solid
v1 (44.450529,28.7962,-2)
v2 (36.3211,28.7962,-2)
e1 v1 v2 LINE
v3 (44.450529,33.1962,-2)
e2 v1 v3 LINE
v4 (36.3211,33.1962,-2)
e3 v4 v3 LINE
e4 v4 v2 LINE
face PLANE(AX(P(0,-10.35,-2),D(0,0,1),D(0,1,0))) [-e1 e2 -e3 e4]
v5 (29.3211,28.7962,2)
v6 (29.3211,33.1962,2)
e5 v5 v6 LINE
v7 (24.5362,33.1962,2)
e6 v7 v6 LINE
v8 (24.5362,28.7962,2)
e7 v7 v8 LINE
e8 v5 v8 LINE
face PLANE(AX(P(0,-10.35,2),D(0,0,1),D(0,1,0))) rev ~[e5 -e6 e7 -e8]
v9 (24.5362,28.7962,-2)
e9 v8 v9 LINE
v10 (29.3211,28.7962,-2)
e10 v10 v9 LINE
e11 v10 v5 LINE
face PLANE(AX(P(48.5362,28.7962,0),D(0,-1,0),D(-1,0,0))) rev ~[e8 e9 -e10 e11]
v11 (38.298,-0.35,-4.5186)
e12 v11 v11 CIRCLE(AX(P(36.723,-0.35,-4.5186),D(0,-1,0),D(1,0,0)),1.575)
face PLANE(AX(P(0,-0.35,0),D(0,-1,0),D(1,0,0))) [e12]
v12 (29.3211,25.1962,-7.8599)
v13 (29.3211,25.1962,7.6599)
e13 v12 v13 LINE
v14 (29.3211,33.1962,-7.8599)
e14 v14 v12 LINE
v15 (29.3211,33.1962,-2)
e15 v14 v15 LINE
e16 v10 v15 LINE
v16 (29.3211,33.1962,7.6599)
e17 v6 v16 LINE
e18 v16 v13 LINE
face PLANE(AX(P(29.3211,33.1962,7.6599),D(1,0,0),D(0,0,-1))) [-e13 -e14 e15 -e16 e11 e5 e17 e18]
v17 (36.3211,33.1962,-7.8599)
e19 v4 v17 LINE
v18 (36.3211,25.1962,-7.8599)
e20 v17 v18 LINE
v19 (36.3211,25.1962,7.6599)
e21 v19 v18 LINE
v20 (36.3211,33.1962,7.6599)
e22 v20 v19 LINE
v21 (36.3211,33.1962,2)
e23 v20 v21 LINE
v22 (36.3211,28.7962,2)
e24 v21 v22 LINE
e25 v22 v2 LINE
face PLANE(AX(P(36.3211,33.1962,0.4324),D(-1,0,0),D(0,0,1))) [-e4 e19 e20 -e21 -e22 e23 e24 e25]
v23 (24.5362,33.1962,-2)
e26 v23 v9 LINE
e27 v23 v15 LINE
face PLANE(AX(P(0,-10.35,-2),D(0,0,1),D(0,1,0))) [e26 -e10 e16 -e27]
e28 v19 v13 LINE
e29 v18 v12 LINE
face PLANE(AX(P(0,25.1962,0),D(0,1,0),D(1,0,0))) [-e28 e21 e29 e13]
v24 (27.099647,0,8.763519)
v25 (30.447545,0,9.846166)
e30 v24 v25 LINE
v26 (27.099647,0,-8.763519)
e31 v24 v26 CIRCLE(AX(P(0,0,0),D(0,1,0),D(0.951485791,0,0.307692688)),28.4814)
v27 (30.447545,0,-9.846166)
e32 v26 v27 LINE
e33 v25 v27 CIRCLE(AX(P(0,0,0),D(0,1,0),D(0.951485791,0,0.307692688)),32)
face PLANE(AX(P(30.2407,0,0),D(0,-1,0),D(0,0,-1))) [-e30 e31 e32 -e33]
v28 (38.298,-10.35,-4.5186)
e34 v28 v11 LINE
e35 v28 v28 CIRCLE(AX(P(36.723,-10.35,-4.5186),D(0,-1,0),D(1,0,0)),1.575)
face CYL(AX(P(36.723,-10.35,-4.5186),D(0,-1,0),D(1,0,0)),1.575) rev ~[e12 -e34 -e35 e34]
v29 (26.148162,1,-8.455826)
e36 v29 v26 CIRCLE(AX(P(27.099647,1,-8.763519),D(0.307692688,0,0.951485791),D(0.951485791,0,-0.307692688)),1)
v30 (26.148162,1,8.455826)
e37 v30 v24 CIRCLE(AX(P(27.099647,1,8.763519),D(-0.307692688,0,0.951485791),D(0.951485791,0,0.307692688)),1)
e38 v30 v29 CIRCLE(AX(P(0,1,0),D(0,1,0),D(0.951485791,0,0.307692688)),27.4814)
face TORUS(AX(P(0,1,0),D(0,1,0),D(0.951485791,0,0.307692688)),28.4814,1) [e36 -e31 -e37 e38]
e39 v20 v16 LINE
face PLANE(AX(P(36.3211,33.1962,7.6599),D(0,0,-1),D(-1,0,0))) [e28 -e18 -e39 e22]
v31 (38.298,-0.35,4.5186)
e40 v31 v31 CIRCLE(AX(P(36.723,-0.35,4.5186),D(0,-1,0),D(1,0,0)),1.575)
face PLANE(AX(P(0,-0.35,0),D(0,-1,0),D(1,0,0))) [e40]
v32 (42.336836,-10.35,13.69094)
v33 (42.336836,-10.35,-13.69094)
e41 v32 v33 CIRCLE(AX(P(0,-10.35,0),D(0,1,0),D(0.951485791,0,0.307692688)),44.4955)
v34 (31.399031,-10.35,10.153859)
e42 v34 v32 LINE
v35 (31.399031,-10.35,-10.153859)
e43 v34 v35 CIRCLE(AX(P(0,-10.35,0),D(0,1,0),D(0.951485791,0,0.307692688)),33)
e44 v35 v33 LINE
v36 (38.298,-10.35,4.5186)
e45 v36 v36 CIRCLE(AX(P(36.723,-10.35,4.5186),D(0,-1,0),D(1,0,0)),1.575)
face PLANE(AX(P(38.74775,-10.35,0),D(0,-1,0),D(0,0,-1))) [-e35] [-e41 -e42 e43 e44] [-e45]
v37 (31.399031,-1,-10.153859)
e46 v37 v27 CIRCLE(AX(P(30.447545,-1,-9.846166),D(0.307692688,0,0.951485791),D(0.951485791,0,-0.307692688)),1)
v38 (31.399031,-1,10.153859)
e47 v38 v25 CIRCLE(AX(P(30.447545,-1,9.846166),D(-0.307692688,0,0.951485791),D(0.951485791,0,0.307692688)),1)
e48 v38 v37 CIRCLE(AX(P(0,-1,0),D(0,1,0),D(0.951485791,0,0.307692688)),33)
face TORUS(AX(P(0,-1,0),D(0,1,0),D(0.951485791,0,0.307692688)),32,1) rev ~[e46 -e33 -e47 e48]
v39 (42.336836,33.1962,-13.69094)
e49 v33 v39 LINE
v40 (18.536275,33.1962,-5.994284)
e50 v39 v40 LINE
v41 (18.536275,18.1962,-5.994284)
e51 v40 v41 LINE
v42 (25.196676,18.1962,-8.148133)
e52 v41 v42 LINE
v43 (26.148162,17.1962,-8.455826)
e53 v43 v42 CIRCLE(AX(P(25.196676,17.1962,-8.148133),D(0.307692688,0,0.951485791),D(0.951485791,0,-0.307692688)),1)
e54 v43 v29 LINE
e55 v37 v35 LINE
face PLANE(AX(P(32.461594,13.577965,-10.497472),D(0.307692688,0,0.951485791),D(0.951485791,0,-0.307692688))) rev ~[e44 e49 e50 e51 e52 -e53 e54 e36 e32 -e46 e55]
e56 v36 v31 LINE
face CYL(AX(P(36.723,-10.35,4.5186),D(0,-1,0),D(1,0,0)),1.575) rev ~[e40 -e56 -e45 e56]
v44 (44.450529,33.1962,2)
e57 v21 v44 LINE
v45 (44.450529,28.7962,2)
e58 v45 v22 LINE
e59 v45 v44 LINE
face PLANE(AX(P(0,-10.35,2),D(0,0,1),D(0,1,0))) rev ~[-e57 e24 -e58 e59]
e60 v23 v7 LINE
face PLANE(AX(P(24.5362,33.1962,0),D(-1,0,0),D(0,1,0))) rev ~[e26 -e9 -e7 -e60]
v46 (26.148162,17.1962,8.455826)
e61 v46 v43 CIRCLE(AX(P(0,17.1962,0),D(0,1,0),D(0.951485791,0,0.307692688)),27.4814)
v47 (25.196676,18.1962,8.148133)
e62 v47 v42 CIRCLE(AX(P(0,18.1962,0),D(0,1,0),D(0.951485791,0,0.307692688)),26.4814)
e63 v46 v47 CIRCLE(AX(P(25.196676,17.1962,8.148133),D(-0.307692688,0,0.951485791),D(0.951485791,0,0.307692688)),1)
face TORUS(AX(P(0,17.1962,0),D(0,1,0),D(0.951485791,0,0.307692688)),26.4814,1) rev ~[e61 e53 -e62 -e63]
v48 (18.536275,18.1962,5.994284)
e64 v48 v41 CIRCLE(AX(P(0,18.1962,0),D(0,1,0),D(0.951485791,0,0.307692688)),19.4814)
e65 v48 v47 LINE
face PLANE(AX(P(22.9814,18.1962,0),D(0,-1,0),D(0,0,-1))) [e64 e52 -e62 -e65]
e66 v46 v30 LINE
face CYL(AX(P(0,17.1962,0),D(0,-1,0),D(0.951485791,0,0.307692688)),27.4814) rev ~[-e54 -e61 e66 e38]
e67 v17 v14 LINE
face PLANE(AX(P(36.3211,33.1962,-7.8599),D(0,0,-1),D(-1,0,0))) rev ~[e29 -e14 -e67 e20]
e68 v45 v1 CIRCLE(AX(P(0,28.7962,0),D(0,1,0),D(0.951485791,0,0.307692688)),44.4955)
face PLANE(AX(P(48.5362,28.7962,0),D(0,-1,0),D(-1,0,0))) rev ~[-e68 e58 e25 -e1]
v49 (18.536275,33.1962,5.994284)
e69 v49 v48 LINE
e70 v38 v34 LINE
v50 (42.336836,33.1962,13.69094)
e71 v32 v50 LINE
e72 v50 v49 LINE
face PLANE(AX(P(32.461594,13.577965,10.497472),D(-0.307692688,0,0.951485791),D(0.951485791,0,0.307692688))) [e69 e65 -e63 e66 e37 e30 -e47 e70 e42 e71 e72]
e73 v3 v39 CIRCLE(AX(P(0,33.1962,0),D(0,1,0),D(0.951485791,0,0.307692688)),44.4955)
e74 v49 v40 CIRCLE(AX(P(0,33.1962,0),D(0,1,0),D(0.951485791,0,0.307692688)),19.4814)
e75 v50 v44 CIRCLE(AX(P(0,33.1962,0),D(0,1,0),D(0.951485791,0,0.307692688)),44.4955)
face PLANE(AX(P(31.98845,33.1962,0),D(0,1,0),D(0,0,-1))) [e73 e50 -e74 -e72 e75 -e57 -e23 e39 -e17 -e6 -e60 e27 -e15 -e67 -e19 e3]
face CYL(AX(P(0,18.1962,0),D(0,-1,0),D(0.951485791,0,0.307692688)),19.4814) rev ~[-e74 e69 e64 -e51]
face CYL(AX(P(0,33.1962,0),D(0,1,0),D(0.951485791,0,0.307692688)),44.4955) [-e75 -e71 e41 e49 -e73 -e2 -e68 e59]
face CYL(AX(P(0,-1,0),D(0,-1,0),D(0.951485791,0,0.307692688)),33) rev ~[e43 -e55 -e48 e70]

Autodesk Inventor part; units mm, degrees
ref_plane "YZ Plane" through (0, 0, 0) normal (1, 0, 0) x (0, 1, 0)
ref_plane "XZ Plane" through (0, 0, 0) normal (0, 1, 0) x (-1, 0, 0)
ref_plane "XY Plane" through (0, 0, 0) normal (0, 0, 1) x (1, 0, 0)
sketch "Эскиз3" plane through (0, 0, 0) normal (0, 0, 1) x (1, 0, 0)
  line L0 (28.4814, 0) -> (32, 0)
  line L1 (26.4814, 18.1962) -> (19.4814, 18.1962)
  line L2 (19.4814, 18.1962) -> (19.4814, 33.1962)
  line L3 (27.4814, 17.1962) -> (27.4814, 1)
  line L4 (33, -1) -> (33, -10.35)
  line L5 (33, -10.35) -> (44.4955, -10.35)
  line L6 (109.4355, -10.35) -> (-108.0344, -10.35) projected
  arc A0 (33, -1) -> (32, 0) centre (32, -1) ccw
  arc A1 (27.4814, 1) -> (28.4814, 0) centre (28.4814, 1) ccw
  arc A2 (27.4814, 17.1962) -> (26.4814, 18.1962) centre (26.4814, 17.1962) ccw
  line L7 (19.4814, 33.1962) -> (44.4955, 33.1962)
  line L8 (44.4955, 33.1962) -> (44.4955, -10.35)
  point P0 (27.4814, 18.1962)
  point P1 (27.4814, 0)
  dimension "d25" = 8
  dimension "d42" = 15
  dimension "d44" = 1
  dimension "d45" = 1
  dimension "d54" = 3.5186
  dimension "d55" = 25.0142
sketch "Эскиз4" plane through (0, 0, 0) normal (0, 1, 0) x (-1, 0, 0)
  arc A0 (-24.7386, 8) -> (-24.7386, -8) centre (0, 0) ccw
  dimension "d31" = 26
sweep "Сдвиг1" add profiles "Эскиз3" path "Эскиз4"
sketch "Эскиз8" plane through (0, -10.35, 0) normal (0, -1, 0) x (1, 0, 0)
  arc A0 (31.399, -10.1538) -> (31.399, 10.1538) centre (0, 0) ccw projected
  arc A1 (35.205, -11.3846) -> (35.205, 11.3846) centre (0, 0) ccw construction
  line L0 (42.3369, -13.6909) -> (31.399, -10.1538) projected
  circle A2 centre (36.723, -4.5186) radius 1.575
  circle A3 centre (36.723, 4.5186) radius 1.575
  line L1 (31.399, 10.1538) -> (42.3369, 13.6909) projected
  point P0 (0, 0)
  dimension "d46" = 4
  dimension "d47" = 3.15
  dimension "d48" = 3.15
  dimension "d49" = 7
  dimension "d50" = 7
extrude "Выдавливание4" cut sketch "Эскиз8" against normal blind 10
sketch "Эскиз9" plane through (0, 33.1962, 0) normal (0, 1, 0) x (1, 0, 0)
  point P0 (0, 0)
ref_plane "РабПлоскость1" through (0, -10.35, 0) normal (0, 0, 1) x (0, 1, 0)
sketch "Эскиз10" plane through (0, -10.35, 0) normal (0, 0, 1) x (0, 1, 0)
  line L0 (47.9462, -48.5362) -> (39.1462, -48.5362)
  line L1 (39.1462, -48.5362) -> (39.1462, -24.5362)
  line L2 (39.1462, -24.5362) -> (47.9462, -24.5362)
  line L3 (47.9462, -24.5362) -> (47.9462, -48.5362)
  line L4 (43.5462, -42.3369) -> (43.5462, -18.5362) projected
  line L5 (47.9462, -48.5362) -> (39.1462, -24.5362) construction
  line L6 (39.1462, -48.5362) -> (47.9462, -24.5362) construction
  line L7 (28.5462, -18.5362) -> (43.5462, -18.5362) projected
  point P0 (10.35, 0)
  point P1 (43.5462, -36.5362)
  dimension "d61" = 8.8
  dimension "d68" = 24
  dimension "d69" = 6
extrude "Выдавливание5" cut sketch "Эскиз10" along normal mid plane 4
sketch "Эскиз11" plane through (0, 33.1962, 0) normal (0, 1, 0) x (1, 0, 0)
  line L0 (34.8211, -6.1599) -> (30.8211, -6.1599)
  line L1 (30.8211, -6.1599) -> (30.8211, -0.8676)
  line L2 (30.8211, -0.8676) -> (34.8211, -0.8676)
  line L3 (34.8211, -0.8676) -> (34.8211, -6.1599)
  line L4 (30.8211, 6.3599) -> (34.8211, 6.3599)
  line L5 (34.8211, 6.3599) -> (34.8211, 1.0676)
  line L6 (34.8211, 1.0676) -> (30.8211, 1.0676)
  line L7 (30.8211, 1.0676) -> (30.8211, 6.3599)
  line L8 (36.3211, 7.8599) -> (29.3211, 7.8599)
  line L9 (29.3211, 7.8599) -> (29.3211, -0.4324)
  line L10 (29.3211, -0.4324) -> (36.3211, -0.4324)
  line L11 (36.3211, -0.4324) -> (36.3211, 7.8599)
  line L12 (36.3211, -7.6599) -> (29.3211, -7.6599)
  line L13 (29.3211, -7.6599) -> (29.3211, 0.6324)
  line L14 (29.3211, 0.6324) -> (36.3211, 0.6324)
  line L15 (36.3211, 0.6324) -> (36.3211, -7.6599)
  point P0 (0, 0)
  point P1 (29.3211, -0.4324)
  dimension "d66" = 1.5
  dimension "d67" = 1.5
extrude "Выдавливание6" cut sketch "Эскиз11" against normal blind 8 contours L0 L1 L2 L3 | L4 L5 L6 L7 | L11 L14 L9 L8 | L11 L10 L9 L14 | L15 L12 L13 L10
properties part number "креп_подш"
